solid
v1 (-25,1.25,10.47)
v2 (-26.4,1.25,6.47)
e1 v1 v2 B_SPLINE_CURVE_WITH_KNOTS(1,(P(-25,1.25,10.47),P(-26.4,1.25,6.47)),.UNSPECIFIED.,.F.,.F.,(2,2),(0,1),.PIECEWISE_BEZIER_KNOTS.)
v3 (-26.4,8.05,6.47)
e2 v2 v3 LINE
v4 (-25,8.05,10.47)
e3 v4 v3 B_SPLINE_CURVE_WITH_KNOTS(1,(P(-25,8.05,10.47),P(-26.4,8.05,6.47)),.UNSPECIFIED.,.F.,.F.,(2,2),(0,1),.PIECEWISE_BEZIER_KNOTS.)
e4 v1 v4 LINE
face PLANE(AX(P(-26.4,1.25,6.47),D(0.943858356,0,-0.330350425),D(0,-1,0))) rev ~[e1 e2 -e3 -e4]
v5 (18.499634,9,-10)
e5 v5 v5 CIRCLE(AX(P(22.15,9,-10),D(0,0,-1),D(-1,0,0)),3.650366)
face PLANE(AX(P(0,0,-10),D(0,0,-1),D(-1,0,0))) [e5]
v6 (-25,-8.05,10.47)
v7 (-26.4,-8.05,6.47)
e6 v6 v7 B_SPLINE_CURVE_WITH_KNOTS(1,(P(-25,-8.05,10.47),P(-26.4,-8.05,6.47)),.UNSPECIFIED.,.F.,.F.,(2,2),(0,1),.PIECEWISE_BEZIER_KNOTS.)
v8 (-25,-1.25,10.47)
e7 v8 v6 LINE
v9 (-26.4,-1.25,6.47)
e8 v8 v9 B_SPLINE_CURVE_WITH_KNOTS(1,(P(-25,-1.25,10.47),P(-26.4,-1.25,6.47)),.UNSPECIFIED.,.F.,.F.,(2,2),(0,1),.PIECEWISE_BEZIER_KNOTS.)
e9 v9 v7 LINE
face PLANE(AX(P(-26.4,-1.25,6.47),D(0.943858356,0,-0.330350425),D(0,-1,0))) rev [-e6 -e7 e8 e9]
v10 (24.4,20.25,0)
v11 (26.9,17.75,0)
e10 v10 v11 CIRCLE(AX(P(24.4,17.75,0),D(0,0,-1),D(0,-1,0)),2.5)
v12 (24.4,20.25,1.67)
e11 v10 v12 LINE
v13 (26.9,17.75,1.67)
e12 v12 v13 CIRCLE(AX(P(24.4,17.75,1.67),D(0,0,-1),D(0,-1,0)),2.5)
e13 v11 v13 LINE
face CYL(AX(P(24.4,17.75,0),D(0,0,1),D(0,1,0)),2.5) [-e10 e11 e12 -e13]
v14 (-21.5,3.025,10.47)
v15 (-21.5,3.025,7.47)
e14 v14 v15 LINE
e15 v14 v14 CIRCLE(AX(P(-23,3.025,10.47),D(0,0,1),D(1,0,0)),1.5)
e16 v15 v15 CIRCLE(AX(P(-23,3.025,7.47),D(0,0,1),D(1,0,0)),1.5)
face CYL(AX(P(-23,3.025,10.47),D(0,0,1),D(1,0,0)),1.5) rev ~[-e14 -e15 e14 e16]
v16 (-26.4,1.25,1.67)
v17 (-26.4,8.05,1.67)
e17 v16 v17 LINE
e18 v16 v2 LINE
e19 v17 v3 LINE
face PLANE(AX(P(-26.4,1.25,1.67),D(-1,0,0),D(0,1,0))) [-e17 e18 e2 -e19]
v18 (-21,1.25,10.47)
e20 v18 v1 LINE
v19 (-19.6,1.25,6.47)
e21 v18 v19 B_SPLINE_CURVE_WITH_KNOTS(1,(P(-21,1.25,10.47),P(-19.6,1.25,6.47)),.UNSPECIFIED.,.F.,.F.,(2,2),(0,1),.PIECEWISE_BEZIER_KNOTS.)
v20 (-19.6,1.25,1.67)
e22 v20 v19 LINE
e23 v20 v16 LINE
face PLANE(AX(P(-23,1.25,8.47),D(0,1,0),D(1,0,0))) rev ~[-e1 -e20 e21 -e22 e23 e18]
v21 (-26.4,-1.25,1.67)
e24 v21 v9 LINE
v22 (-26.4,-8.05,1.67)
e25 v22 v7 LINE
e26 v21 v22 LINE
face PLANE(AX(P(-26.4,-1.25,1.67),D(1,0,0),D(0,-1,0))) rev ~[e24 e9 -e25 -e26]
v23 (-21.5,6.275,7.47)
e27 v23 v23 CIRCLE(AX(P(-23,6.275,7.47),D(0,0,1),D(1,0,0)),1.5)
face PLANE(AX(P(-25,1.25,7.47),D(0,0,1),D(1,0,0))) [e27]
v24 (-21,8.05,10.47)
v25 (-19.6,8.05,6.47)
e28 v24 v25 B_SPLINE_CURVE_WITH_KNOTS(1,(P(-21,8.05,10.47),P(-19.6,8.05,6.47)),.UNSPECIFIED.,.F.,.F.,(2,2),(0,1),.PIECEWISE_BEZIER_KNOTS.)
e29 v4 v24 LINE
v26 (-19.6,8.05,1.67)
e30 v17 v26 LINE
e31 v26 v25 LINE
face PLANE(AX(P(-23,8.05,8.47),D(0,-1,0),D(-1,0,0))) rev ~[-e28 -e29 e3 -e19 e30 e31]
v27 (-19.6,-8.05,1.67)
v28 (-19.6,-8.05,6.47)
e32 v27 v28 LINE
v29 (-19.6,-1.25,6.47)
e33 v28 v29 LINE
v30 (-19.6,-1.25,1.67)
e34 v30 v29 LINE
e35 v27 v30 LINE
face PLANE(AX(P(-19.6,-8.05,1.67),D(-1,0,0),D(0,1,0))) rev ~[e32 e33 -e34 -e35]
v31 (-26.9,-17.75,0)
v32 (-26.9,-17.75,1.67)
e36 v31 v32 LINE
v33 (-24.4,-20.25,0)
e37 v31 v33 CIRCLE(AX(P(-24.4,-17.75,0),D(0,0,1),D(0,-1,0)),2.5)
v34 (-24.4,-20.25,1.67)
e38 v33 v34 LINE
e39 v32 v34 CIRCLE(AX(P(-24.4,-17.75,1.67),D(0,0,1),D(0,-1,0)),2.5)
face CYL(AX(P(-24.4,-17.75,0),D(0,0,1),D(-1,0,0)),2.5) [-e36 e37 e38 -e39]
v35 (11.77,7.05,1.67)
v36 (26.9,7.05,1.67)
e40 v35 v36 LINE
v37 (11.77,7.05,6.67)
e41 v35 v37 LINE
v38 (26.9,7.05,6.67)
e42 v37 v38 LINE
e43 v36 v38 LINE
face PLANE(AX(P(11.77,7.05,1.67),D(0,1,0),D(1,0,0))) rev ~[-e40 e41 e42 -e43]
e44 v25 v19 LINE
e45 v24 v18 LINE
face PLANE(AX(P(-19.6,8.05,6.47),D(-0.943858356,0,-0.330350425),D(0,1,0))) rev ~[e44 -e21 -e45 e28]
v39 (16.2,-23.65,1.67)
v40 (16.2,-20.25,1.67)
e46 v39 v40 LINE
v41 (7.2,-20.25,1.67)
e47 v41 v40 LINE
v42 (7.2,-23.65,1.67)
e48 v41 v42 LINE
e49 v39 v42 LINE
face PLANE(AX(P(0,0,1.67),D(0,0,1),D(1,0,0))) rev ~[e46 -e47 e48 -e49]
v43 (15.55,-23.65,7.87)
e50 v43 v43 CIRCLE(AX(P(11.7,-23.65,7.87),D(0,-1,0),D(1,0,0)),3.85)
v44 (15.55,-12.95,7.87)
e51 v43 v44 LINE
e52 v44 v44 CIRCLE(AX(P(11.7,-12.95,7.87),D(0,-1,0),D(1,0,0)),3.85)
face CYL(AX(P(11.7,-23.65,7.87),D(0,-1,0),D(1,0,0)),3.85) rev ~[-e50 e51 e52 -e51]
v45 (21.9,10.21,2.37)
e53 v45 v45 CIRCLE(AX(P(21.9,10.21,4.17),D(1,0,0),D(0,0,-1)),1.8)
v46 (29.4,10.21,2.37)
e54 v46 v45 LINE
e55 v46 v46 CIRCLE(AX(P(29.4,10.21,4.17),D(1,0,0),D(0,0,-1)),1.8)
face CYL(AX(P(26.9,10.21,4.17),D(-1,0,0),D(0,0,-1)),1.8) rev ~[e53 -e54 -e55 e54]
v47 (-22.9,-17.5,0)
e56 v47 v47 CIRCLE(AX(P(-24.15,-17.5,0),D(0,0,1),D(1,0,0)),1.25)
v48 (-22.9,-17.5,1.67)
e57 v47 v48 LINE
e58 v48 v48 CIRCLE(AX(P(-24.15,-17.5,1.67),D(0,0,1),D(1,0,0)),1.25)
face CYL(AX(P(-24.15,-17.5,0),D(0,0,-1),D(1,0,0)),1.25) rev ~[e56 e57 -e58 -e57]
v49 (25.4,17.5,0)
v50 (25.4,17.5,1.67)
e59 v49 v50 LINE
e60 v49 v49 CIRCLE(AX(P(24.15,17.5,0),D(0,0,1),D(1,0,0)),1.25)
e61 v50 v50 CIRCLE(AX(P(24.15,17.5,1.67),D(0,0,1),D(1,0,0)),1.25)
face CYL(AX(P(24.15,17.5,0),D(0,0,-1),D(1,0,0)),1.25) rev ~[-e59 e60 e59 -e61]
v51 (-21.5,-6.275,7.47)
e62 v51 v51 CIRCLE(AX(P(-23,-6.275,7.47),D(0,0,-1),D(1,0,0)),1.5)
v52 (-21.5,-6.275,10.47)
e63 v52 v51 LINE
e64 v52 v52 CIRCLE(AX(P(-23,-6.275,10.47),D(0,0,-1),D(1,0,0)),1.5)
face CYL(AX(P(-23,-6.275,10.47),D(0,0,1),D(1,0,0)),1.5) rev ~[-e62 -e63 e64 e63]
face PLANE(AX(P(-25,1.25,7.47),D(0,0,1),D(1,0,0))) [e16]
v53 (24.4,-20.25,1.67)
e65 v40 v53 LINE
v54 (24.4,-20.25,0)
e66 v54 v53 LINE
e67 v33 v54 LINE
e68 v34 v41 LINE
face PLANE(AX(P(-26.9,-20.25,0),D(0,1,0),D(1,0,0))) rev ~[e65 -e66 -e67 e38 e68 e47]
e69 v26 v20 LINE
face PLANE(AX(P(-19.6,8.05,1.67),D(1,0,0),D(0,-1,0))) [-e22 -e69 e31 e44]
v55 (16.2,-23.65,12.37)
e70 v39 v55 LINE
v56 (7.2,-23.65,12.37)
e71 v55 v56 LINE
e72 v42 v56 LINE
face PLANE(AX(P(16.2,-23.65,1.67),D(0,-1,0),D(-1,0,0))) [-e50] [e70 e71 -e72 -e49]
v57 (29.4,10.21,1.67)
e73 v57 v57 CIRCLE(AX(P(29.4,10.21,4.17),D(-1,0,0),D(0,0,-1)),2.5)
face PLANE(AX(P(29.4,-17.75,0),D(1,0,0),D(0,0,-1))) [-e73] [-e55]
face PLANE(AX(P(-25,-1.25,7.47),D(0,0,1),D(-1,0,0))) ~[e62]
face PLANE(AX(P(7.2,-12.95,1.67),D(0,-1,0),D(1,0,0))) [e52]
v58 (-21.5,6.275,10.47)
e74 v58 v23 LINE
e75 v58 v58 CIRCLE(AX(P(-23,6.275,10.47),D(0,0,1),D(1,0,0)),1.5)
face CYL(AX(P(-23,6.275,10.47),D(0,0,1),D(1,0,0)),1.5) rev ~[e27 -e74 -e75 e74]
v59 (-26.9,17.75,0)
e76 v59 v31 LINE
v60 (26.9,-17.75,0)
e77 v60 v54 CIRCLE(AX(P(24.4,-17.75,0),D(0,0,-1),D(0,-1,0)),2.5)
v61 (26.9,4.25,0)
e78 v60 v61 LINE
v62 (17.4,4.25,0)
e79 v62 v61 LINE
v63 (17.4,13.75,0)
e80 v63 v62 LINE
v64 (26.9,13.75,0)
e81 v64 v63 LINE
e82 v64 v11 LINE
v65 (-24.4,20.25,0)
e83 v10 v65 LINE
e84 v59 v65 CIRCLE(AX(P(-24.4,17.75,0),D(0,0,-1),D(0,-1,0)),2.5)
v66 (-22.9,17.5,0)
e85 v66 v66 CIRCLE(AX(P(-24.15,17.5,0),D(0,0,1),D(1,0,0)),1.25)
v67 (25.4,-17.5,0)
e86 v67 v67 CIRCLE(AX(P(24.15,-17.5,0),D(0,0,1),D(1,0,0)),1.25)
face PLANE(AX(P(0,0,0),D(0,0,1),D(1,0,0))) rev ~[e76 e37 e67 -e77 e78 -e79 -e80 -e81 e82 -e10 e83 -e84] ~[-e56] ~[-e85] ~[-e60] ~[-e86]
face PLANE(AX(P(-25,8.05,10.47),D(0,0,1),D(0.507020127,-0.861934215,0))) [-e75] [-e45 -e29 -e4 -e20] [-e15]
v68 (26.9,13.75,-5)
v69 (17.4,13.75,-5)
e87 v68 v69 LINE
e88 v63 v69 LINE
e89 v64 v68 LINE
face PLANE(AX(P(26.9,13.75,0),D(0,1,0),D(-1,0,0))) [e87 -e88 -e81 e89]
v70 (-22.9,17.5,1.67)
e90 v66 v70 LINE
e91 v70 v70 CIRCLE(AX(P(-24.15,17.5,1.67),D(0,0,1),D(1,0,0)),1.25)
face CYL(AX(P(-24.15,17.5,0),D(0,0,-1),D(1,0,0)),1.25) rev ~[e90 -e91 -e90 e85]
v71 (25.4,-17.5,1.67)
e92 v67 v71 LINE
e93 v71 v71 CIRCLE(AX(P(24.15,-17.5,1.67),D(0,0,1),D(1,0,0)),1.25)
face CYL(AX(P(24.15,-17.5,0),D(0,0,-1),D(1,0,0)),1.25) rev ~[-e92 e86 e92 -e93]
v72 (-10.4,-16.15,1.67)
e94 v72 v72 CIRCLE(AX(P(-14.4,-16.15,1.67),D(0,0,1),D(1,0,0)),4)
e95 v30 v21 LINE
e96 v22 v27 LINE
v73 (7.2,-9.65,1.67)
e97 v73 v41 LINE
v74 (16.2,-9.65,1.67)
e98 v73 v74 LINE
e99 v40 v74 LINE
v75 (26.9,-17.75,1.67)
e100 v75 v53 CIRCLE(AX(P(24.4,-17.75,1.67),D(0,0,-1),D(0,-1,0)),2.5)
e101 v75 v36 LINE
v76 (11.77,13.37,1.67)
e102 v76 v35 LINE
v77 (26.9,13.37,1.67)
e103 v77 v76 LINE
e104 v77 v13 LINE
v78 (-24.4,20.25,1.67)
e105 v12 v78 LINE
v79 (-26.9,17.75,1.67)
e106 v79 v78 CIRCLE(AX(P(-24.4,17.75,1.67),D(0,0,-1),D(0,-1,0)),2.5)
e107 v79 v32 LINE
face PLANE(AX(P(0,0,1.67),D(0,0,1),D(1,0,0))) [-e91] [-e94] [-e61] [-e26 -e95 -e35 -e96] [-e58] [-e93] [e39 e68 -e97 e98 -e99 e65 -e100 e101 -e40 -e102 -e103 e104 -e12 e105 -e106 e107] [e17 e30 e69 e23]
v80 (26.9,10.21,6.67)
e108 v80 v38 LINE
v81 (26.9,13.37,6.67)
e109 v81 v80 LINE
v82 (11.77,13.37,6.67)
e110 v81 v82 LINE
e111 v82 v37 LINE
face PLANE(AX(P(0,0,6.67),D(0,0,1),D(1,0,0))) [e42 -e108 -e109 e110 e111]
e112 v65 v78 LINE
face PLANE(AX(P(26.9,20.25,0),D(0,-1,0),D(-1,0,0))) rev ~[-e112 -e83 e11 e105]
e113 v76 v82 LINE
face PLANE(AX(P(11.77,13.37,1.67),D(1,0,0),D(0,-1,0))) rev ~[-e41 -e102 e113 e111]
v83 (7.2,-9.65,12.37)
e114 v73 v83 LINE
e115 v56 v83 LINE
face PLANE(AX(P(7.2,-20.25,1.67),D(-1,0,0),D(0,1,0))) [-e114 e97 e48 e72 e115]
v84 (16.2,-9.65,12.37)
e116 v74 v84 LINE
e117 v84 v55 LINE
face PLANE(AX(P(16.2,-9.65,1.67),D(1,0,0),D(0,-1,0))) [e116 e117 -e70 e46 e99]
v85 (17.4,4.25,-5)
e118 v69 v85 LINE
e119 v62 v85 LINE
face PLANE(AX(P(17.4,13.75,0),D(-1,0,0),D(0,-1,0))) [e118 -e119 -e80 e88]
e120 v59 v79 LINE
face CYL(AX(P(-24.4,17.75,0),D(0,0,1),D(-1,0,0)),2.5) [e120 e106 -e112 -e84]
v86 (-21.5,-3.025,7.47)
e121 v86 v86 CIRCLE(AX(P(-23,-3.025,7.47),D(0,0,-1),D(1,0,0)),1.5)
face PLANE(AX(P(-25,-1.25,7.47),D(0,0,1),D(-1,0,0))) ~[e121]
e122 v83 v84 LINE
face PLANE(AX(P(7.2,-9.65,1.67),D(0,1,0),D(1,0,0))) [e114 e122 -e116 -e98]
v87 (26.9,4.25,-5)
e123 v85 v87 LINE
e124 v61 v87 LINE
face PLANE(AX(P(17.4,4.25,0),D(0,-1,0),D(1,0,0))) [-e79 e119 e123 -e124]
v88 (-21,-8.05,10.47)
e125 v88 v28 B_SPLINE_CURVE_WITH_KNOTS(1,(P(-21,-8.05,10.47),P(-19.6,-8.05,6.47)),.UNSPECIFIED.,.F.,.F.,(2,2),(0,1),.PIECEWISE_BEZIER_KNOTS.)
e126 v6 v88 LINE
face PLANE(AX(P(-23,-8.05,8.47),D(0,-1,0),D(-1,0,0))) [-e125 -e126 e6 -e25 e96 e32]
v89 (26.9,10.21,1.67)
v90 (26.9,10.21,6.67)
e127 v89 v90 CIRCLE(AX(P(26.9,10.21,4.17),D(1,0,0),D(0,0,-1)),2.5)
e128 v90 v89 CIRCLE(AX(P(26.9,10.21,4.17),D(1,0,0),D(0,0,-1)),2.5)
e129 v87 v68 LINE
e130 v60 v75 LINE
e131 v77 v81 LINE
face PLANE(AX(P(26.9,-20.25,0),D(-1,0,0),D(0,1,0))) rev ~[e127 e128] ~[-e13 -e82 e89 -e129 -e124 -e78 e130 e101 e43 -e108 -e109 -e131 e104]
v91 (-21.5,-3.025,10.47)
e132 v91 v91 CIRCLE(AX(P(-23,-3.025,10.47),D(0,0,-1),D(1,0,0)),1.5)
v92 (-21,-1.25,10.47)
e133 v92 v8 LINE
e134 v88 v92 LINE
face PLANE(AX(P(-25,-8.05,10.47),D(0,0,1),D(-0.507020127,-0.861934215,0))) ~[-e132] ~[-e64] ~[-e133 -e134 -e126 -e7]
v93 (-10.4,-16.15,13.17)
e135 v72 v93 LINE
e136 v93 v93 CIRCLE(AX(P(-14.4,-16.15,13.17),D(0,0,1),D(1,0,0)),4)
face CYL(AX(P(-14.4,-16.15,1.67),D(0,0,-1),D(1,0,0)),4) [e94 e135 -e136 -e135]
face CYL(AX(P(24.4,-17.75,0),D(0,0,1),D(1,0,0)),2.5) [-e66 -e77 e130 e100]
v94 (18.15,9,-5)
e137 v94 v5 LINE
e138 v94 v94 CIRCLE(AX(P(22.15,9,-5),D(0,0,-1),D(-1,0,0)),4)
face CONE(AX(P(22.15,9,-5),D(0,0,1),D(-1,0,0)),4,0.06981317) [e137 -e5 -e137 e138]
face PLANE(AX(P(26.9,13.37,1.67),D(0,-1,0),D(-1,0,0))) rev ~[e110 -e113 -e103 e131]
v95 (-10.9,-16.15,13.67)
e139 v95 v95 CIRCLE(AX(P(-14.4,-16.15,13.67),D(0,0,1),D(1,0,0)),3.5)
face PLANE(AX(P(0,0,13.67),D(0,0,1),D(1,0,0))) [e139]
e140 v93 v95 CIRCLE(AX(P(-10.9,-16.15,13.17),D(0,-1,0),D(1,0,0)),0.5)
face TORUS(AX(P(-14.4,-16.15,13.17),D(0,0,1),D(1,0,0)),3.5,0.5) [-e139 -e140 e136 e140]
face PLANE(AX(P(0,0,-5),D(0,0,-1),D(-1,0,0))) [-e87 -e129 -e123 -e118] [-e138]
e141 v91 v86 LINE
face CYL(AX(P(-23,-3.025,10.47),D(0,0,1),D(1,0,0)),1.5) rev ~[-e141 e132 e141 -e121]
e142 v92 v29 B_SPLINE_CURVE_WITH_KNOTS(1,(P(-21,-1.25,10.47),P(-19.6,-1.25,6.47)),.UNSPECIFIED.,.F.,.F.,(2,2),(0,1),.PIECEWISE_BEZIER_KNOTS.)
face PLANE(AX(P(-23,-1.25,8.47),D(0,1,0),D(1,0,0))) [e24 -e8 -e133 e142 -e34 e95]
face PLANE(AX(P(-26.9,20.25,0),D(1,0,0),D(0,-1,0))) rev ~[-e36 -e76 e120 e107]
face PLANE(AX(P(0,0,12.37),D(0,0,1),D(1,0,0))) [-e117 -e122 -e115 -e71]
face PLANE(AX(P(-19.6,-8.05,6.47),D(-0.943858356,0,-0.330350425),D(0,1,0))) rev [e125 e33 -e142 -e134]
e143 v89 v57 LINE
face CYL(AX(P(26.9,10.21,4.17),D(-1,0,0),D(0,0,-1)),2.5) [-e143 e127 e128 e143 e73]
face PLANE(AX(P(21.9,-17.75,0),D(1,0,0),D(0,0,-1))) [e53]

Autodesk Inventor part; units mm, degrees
ref_plane "YZ Plane" through (0, 0, 0) normal (1, 0, 0) x (0, 1, 0)
ref_plane "XZ Plane" through (0, 0, 0) normal (0, 1, 0) x (-1, 0, 0)
sketch "Base" plane through (0, 0, 0) normal (0, 0, 1) x (1, 0, 0)
  line L0 (-26.9, -20.25) -> (26.9, -20.25)
  line L1 (26.9, -20.25) -> (26.9, 20.25)
  line L2 (26.9, 20.25) -> (-26.9, 20.25)
  line L3 (-26.9, 20.25) -> (-26.9, -20.25)
  line L4 (-26.9, -20.25) -> (26.9, 20.25) construction
  line L5 (26.9, -20.25) -> (-26.9, 20.25) construction
  line L6 (-25.4, 16.25) -> (-22.9, 16.25) construction
  line L7 (-22.9, 16.25) -> (-22.9, 18.75) construction
  line L8 (-22.9, 18.75) -> (-25.4, 18.75) construction
  line L9 (-25.4, 18.75) -> (-25.4, 16.25) construction
  line L10 (-25.4, 16.25) -> (-22.9, 18.75) construction
  line L11 (-22.9, 16.25) -> (-25.4, 18.75) construction
  circle A0 centre (-24.15, 17.5) radius 1.25
  line L12 (-26.9, 0) -> (0, 0) construction
  line L13 (0, 20.25) -> (0, 0) construction
  circle A1 centre (-24.15, -17.5) radius 1.25
  circle A2 centre (24.15, 17.5) radius 1.25
  circle A3 centre (24.15, -17.5) radius 1.25
  point P0 (-25.4, 17.5)
  dimension "d0" = 53.8
  dimension "d1" = 40.5
  dimension "d2" = 1.5
  dimension "d3" = 1.5
  dimension "d4" = 2.5
extrude "BaseFeature" add sketch "Base" along normal blind 1.67
fillet "Fillet1" radius 2.5 4 edges at (-26.9, -20.25, 0.835) (26.9, -20.25, 0.835) (-26.9, 20.25, 0.835) (26.9, 20.25, 0.835)
sketch "Sketch2" plane through (0, 0, 1.67) normal (0, 0, 1) x (1, 0, 0)
  line L0 (-26.9, 17.75) -> (-26.9, -17.75) projected
  line L1 (-26.9, 0) -> (0, 0) construction
  line L2 (-26.4, 8.05) -> (-19.6, 8.05)
  line L3 (-19.6, 8.05) -> (-19.6, 1.25)
  line L4 (-19.6, 1.25) -> (-26.4, 1.25)
  line L5 (-26.4, 1.25) -> (-26.4, 8.05)
  line L6 (-26.4, -8.05) -> (-19.6, -8.05)
  line L7 (-19.6, -8.05) -> (-19.6, -1.25)
  line L8 (-19.6, -1.25) -> (-26.4, -1.25)
  line L9 (-26.4, -1.25) -> (-26.4, -8.05)
  dimension "d8" = 1.25
  dimension "d9" = 0.5
  dimension "d10" = 6.8
extrude "Extrusion2" add sketch "Sketch2" along normal blind 4.8
ref_plane "Work Plane1" through (0, 0, 10.47) normal (0, 0, 1) x (1, 0, 0)
sketch "Sketch3" plane through (0, 0, 10.47) normal (0, 0, 1) x (1, 0, 0)
  line L0 (-26.4, 8.05) -> (-19.6, 8.05) projected
  line L1 (-23, 8.05) -> (-23, 1.25) construction
  line L2 (-19.6, 1.25) -> (-26.4, 1.25) projected
  line L3 (-37.66, 0) -> (37.66, 0) construction
  line L4 (-26.4, 1.25) -> (-19.6, 1.25) projected
  line L5 (-19.6, 1.25) -> (-19.6, 8.05) projected
  line L6 (-19.6, 8.05) -> (-26.4, 8.05) projected
  line L7 (-26.4, 8.05) -> (-26.4, 1.25) projected
  line L8 (-25, 8.05) -> (-21, 8.05)
  line L9 (-21, 8.05) -> (-21, 1.25)
  line L10 (-21, 1.25) -> (-25, 1.25)
  line L11 (-25, 1.25) -> (-25, 8.05)
  point P0 (0, 0)
  dimension "d14" = 4
sketch "Sketch4" plane through (0, 0, 6.47) normal (0, 0, 1) x (1, 0, 0)
  line L0 (-26.4, 1.25) -> (-19.6, 1.25) projected
  line L1 (-19.6, 1.25) -> (-19.6, 8.05) projected
  line L2 (-19.6, 8.05) -> (-26.4, 8.05) projected
  line L3 (-26.4, 8.05) -> (-26.4, 1.25) projected
  point P0 (0, 0)
loft "Loft1" add profiles "Sketch3" section 2 edges at (-23, 1.25, 6.47) (-19.6, 4.65, 6.47) (-23, 8.05, 6.47) (-26.4, 4.65, 6.47) contours L0 L9 L2 L11
mirror "Mirror1" about plane through (0, 0, 0) normal (0, 1, 0) of "Loft1"
sketch "Sketch5" plane through (-25, 1.25, 10.47) normal (0, 0, 1) x (1, 0, 0)
  line L0 (0, 6.8) -> (0, 0) projected
  line L1 (0, 0) -> (4, 0) projected
  line L2 (4, 0) -> (4, 6.8) projected
  line L3 (4, 6.8) -> (0, 6.8) projected
  line L4 (-12.66, -1.25) -> (62.66, -1.25) construction
  line L5 (2, 6.8) -> (2, 0) construction
  circle A0 centre (2, 5.025) radius 1.5
  line L6 (0, 3.4) -> (4, 3.4) construction
  circle A1 centre (2, 1.775) radius 1.5
  point P0 (25, -1.25)
  dimension "d19" = 3
  dimension "d20" = 3.25
extrude "Extrusion3" cut sketch "Sketch5" against normal blind 3 contours A0 | A1
mirror "Mirror2" about plane through (0, 0, 0) normal (0, 1, 0) of "Extrusion3"
sketch "Sketch6" plane through (0, 0, 1.67) normal (0, 0, 1) x (1, 0, 0)
  line L0 (-24.4, -20.25) -> (24.4, -20.25) projected
  line L1 (-26.9, 17.75) -> (-26.9, -17.75) projected
  circle A0 centre (-14.4, -16.15) radius 4
  line L2 (-18.4, -16.15) -> (-18.4, -20.25) construction
  point P0 (0, 0)
  dimension "d23" = 8
  dimension "d24" = 4.1
  dimension "d25" = 8.5
extrude "Extrusion4" add sketch "Sketch6" along normal blind 12
fillet "Fillet2" radius 0.5 1 edges at (-18.4, -16.15, 13.67)
sketch "Sketch7" plane through (0, 0, 1.67) normal (0, 0, 1) x (1, 0, 0)
  line L0 (7.2, -9.65) -> (16.2, -9.65)
  line L1 (16.2, -9.65) -> (16.2, -23.65)
  line L2 (16.2, -23.65) -> (7.2, -23.65)
  line L3 (7.2, -23.65) -> (7.2, -9.65)
  line L4 (7.2, -23.65) -> (16.2, -23.65)
  line L5 (16.2, -23.65) -> (16.2, -20.25)
  line L6 (16.2, -20.25) -> (7.2, -20.25)
  line L7 (7.2, -20.25) -> (7.2, -23.65)
  line L8 (-24.4, -20.25) -> (24.4, -20.25) projected
  line L9 (26.9, -17.75) -> (26.9, 17.75) projected
  point P0 (0, 0)
  point P1 (11.7, -23.65)
  dimension "d29" = 9
  dimension "d30" = 14
  dimension "d31" = 3.4
  dimension "d32" = 10.7
extrude "Extrusion5" add sketch "Sketch7" along normal blind 10.7
sketch "Sketch8" plane through (7.2, -23.65, 1.67) normal (0, -1, 0) x (1, 0, 0)
  line L0 (0, 0) -> (9, 0) projected
  line L1 (9, 0) -> (9, 10.7) projected
  line L2 (0, 10.7) -> (9, 10.7) projected
  line L3 (0, 0) -> (0, 10.7) projected
  line L4 (4.5, 10.7) -> (4.5, 0) construction
  circle A0 centre (4.5, 6.2) radius 3.85
  point P0 (-7.2, -1.67)
  dimension "d35" = 7.7
  dimension "d36" = 4.5
extrude "Extrusion6" cut sketch "Sketch8" against normal blind 10.7 contours A0
sketch "Sketch9" plane through (0, 0, 1.67) normal (0, 0, 1) x (1, 0, 0)
  line L0 (11.77, 7.05) -> (29.4, 7.05)
  line L1 (29.4, 7.05) -> (29.4, 13.37)
  line L2 (29.4, 13.37) -> (11.77, 13.37)
  line L3 (11.77, 13.37) -> (11.77, 7.05)
  line L4 (24.4, 20.25) -> (-24.4, 20.25) projected
  line L5 (26.9, 13.37) -> (26.9, 7.05)
  line L6 (26.9, -17.75) -> (26.9, 17.75) projected
  point P0 (0, 0)
  dimension "d39" = 13.2
  dimension "d40" = 6.32
  dimension "d41" = 17.63
  dimension "d42" = 2.5
extrude "Extrusion7" add sketch "Sketch9" along normal blind 5 contours L3 L2 L5 L0
sketch "Sketch10" plane through (26.9, -17.75, 0) normal (1, 0, 0) x (0, 0, -1)
  line L0 (-1.67, 24.8) -> (-6.67, 24.8) construction
  line L1 (-1.67, 31.12) -> (-6.67, 31.12) construction
  line L2 (-6.67, 24.8) -> (-1.67, 31.12) construction
  circle A0 centre (-4.17, 27.96) radius 1.8
  point P0 (0, 17.75)
  dimension "d45" = 3.6
extrude "Extrusion8" cut sketch "Sketch10" against normal blind 5
sketch "Sketch11" plane through (26.9, -17.75, 0) normal (1, 0, 0) x (0, 0, -1)
  circle A0 centre (-4.17, 27.96) radius 1.8 projected
  line L0 (-6.67, 24.8) -> (-6.67, 31.12) projected
  circle A1 centre (-4.17, 27.96) radius 2.5
  point P0 (0, 17.75)
extrude "Extrusion9" add sketch "Sketch11" along normal blind 2.5
sketch "Sketch12" plane through (0, 0, 0) normal (0, 0, -1) x (-1, 0, 0)
  line L0 (-26.9, 13.75) -> (-17.4, 13.75)
  line L1 (-17.4, 13.75) -> (-17.4, 4.25)
  line L2 (-17.4, 4.25) -> (-26.9, 4.25)
  line L3 (-26.9, 4.25) -> (-26.9, 13.75)
  line L4 (-26.9, -17.75) -> (-26.9, 17.75) projected
  line L5 (-24.4, 20.25) -> (24.4, 20.25) projected
  point P0 (0, 0)
  dimension "d50" = 9.5
  dimension "d51" = 6.5
extrude "Extrusion10" add sketch "Sketch12" along normal blind 5
sketch "Sketch13" plane through (0, 0, -5) normal (0, 0, -1) x (-1, 0, 0)
  line L0 (-17.4, 13.75) -> (-26.9, 13.75) projected
  line L1 (-26.9, 13.75) -> (-26.9, 4.25) projected
  line L2 (-26.9, 4.25) -> (-17.4, 4.25) projected
  line L3 (-17.4, 4.25) -> (-17.4, 13.75) projected
  circle A0 centre (-22.15, 9) radius 4
  line L4 (-17.4, 13.75) -> (-17.4, 4.25) projected
  line L5 (-26.9, 13.75) -> (-17.4, 4.25) construction
  point P0 (0, 0)
  dimension "d54" = 8
extrude "Extrusion11" add sketch "Sketch13" along normal blind 5 draft -4 contours A0
properties part number "FaceAudioBoard"
